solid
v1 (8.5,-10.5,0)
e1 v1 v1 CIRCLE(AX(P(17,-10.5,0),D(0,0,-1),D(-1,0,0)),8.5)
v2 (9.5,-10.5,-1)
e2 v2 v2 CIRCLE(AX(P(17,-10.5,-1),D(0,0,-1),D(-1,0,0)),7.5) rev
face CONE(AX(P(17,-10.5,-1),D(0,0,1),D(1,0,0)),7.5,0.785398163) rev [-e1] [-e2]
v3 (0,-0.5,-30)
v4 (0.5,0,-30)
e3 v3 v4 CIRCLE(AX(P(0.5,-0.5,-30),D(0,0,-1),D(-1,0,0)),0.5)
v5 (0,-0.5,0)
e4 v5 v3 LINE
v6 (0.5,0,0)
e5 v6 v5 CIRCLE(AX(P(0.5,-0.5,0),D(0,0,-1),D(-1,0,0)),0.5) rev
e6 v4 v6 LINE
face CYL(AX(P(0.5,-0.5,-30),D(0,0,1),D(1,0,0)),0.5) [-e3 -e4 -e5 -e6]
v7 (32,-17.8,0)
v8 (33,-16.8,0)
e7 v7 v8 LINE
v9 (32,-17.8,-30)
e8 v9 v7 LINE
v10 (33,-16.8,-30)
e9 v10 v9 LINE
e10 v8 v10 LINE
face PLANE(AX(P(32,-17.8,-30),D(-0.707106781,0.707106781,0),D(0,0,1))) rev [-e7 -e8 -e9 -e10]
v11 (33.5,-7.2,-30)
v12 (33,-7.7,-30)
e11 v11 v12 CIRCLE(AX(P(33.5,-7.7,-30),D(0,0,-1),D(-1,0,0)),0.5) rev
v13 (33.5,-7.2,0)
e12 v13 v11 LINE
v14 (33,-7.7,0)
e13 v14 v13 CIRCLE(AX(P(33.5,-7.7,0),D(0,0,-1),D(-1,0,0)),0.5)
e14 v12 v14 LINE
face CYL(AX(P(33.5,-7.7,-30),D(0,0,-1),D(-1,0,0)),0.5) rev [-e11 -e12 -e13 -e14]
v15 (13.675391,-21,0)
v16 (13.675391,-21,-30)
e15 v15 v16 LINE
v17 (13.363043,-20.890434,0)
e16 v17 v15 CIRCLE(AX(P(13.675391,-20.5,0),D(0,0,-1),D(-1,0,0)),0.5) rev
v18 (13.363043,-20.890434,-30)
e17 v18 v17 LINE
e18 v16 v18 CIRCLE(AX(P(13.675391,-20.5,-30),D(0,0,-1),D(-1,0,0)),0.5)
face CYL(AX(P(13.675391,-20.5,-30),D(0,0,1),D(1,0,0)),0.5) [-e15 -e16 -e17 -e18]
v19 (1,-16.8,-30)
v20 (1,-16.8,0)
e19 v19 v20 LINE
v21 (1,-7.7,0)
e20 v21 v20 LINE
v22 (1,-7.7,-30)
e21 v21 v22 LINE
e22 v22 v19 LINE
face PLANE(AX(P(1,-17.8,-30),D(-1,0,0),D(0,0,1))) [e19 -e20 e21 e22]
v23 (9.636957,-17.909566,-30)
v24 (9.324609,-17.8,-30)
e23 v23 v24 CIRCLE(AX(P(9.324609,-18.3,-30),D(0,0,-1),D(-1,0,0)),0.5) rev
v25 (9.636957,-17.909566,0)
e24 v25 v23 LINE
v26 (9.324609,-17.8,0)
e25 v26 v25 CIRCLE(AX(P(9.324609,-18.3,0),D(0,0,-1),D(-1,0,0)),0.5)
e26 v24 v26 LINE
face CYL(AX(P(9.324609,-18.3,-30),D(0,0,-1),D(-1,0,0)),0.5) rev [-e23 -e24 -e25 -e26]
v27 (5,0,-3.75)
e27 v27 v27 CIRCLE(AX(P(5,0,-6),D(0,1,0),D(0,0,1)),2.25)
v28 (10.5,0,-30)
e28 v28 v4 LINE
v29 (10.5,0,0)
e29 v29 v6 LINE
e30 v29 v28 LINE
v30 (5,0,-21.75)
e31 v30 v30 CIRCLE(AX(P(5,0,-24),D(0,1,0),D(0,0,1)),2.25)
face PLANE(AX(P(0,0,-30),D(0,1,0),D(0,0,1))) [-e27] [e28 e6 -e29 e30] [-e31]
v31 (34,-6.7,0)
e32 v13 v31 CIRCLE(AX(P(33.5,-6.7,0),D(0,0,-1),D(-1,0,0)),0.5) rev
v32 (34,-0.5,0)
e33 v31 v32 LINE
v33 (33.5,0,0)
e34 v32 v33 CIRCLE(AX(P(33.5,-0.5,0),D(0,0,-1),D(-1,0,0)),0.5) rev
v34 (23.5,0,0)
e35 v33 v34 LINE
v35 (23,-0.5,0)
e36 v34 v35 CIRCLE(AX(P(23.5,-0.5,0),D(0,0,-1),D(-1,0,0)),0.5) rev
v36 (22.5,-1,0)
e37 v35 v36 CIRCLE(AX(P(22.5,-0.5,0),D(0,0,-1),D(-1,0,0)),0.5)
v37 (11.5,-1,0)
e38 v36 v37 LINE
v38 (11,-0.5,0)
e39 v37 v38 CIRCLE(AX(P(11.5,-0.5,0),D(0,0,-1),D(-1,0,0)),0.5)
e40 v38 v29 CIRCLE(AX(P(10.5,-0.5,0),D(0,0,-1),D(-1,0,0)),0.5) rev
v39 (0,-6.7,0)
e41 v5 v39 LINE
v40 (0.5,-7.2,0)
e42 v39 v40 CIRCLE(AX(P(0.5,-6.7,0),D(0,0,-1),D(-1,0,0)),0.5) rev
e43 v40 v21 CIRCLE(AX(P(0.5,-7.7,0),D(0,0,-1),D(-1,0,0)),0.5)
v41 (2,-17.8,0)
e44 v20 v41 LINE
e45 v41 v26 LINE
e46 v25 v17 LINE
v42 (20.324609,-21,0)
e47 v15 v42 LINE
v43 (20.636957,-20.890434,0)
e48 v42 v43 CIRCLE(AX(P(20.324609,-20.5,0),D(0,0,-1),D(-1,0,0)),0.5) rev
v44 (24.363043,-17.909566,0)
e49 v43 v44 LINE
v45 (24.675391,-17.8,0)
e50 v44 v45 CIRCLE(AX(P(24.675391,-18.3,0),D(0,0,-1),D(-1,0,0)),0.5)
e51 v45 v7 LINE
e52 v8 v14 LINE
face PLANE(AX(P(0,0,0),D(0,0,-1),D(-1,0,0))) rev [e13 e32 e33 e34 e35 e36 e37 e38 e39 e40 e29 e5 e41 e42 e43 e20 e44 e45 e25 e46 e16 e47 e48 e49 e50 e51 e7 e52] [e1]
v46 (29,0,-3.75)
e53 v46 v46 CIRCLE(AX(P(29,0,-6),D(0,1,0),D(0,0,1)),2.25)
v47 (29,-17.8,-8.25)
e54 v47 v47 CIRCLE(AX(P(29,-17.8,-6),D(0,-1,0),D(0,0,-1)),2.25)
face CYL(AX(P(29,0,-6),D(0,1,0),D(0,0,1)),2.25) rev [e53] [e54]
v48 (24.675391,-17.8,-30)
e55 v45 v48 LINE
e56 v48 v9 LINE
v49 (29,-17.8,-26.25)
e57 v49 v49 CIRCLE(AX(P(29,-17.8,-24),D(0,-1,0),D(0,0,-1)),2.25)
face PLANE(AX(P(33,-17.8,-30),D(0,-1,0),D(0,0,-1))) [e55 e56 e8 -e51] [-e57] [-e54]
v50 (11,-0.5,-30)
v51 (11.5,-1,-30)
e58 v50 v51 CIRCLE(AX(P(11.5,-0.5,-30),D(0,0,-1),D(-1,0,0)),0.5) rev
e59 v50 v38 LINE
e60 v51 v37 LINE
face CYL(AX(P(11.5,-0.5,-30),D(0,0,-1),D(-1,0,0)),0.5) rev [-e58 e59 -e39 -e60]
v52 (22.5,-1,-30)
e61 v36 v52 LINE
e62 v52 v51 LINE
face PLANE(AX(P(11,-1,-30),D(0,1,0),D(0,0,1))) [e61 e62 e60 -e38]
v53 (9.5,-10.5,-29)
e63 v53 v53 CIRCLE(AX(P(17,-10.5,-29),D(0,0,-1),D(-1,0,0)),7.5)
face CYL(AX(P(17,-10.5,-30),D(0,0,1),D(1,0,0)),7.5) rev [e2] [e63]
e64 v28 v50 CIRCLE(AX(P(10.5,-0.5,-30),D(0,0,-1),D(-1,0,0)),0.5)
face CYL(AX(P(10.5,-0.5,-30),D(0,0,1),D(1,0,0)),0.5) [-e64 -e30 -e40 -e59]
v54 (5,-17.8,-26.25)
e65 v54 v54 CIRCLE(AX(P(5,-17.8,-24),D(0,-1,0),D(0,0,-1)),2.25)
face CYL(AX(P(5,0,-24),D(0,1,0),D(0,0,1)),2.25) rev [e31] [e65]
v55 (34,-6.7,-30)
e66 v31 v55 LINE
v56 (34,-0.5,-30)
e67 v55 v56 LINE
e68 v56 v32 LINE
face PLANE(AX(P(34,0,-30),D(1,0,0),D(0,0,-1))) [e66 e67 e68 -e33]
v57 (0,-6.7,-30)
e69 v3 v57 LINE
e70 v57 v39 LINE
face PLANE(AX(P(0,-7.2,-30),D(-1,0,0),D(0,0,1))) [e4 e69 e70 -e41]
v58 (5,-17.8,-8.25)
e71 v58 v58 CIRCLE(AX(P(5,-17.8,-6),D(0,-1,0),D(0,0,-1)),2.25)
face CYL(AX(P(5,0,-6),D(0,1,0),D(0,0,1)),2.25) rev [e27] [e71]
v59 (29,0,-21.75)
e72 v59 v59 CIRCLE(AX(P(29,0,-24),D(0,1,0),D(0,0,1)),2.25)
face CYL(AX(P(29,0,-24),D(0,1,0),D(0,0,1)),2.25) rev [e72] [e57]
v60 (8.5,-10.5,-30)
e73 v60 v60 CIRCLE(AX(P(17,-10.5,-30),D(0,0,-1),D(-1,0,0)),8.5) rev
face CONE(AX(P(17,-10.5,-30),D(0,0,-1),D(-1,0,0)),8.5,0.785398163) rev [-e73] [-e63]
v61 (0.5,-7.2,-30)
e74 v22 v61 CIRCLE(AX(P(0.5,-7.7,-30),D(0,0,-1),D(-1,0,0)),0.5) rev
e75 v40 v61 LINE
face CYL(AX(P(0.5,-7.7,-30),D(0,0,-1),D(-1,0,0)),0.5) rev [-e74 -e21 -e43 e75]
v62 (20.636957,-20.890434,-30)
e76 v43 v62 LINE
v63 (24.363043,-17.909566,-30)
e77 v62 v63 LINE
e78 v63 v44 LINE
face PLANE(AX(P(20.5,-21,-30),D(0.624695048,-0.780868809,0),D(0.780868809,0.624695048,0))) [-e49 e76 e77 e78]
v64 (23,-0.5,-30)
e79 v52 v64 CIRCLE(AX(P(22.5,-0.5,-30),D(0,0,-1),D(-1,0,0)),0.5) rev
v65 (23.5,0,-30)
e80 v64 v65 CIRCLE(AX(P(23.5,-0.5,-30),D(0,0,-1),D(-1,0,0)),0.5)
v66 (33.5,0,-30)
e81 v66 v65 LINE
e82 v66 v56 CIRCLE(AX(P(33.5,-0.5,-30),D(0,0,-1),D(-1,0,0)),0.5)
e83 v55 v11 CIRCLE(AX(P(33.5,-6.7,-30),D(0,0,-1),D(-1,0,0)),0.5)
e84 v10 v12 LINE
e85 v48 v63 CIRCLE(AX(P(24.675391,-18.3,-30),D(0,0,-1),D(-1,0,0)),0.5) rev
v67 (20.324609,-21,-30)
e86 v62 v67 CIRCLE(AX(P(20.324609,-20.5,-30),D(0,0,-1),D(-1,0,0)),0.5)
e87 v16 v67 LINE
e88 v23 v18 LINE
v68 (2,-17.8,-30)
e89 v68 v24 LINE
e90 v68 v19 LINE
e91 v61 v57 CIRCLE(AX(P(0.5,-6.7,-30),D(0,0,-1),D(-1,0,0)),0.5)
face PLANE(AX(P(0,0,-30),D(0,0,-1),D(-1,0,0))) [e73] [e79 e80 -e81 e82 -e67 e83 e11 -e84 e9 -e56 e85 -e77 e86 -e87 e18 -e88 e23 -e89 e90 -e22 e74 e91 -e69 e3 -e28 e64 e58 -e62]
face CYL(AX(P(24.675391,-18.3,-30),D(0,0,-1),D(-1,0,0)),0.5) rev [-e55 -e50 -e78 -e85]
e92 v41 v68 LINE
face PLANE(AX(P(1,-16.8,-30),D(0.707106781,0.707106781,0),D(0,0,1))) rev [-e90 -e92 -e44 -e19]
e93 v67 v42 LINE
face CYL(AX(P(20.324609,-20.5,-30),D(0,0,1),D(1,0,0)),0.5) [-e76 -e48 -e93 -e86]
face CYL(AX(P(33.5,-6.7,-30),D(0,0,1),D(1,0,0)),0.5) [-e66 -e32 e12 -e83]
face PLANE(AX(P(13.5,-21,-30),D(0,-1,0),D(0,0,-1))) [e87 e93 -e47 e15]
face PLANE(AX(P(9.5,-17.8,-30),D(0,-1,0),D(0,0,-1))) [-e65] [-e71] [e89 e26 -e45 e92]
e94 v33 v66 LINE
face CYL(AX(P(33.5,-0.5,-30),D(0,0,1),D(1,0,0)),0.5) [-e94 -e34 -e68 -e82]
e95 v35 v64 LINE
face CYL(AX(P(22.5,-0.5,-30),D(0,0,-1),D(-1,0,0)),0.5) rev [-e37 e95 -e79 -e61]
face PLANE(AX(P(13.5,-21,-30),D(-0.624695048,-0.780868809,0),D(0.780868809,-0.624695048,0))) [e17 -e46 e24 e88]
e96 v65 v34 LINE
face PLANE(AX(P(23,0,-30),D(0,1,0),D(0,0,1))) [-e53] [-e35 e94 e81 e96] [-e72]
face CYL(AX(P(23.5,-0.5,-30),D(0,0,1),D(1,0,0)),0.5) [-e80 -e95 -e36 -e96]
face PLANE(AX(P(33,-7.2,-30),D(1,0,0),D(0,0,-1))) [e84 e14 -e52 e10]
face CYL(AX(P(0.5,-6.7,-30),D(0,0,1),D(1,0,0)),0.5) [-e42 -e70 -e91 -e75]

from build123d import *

# Parameters (mm, degrees)
ESTRUSIONE_ESTRUSIONE1_DEPTH = 30
SCHIZZO3_R                   = 7.5
TAGLIO_ESTRUSIONE2_DEPTH     = 50.969990995
SMUSSO1_SIZE                 = 1
RACCORDO1_R                  = 0.5
FORO_PER_VITE_M4_1_D         = 4.5


with BuildPart() as part:
    # Schizzo2 → Estrusione-Estrusione1 (new body)
    with BuildSketch(Plane.XY):
        Polygon((0, 0), (11, 0), (11, -1), (23, -1), (23, 0), (34, 0), (34, -7.2), (33, -7.2), (33, -17.8), (24.5, -17.8), (20.5, -21), (13.5, -21), (9.5, -17.8), (1, -17.8), (1, -7.2), (0, -7.2), align=None)
    extrude(amount=-ESTRUSIONE_ESTRUSIONE1_DEPTH)

    # Schizzo3 → Taglio-Estrusione2 (cut, through all)
    with BuildSketch(Plane.XY):
        with Locations((17, -10.5)):
            Circle(SCHIZZO3_R)
    extrude(amount=-TAGLIO_ESTRUSIONE2_DEPTH, mode=Mode.SUBTRACT)

    # Smusso1
    smusso1_edges = [part.edges().sort_by_distance(p)[0] for p in [
        (33, -17.8, -15),
        (1, -17.8, -15),
        (9.5, -10.5, -30),
        (9.5, -10.5, 0),
    ]]
    chamfer(smusso1_edges, length=SMUSSO1_SIZE)

    # Raccordo1
    raccordo1_edges = [part.edges().sort_by_distance(p)[0] for p in [
        (9.5, -17.8, -15),
        (24.5, -17.8, -15),
        (20.5, -21, -15),
        (13.5, -21, -15),
        (1, -7.2, -15),
        (0, -7.2, -15),
        (0, 0, -15),
        (23, -1, -15),
        (11, -1, -15),
        (11, 0, -15),
        (23, 0, -15),
        (34, 0, -15),
        (34, -7.2, -15),
        (33, -7.2, -15),
    ]]
    fillet(raccordo1_edges, radius=RACCORDO1_R - 0.0001)  # a hair under: the kernel refuses the full size

    # Foro per Vite M4-1 (through all)
    with Locations(Plane(origin=(0, 0, 0), x_dir=(1, 0, 0), z_dir=(0, 1, 0))):
        with Locations((29, 24), (29, 6), (5, 6), (5, 24)):
            Hole(FORO_PER_VITE_M4_1_D / 2)


solid = part.part
